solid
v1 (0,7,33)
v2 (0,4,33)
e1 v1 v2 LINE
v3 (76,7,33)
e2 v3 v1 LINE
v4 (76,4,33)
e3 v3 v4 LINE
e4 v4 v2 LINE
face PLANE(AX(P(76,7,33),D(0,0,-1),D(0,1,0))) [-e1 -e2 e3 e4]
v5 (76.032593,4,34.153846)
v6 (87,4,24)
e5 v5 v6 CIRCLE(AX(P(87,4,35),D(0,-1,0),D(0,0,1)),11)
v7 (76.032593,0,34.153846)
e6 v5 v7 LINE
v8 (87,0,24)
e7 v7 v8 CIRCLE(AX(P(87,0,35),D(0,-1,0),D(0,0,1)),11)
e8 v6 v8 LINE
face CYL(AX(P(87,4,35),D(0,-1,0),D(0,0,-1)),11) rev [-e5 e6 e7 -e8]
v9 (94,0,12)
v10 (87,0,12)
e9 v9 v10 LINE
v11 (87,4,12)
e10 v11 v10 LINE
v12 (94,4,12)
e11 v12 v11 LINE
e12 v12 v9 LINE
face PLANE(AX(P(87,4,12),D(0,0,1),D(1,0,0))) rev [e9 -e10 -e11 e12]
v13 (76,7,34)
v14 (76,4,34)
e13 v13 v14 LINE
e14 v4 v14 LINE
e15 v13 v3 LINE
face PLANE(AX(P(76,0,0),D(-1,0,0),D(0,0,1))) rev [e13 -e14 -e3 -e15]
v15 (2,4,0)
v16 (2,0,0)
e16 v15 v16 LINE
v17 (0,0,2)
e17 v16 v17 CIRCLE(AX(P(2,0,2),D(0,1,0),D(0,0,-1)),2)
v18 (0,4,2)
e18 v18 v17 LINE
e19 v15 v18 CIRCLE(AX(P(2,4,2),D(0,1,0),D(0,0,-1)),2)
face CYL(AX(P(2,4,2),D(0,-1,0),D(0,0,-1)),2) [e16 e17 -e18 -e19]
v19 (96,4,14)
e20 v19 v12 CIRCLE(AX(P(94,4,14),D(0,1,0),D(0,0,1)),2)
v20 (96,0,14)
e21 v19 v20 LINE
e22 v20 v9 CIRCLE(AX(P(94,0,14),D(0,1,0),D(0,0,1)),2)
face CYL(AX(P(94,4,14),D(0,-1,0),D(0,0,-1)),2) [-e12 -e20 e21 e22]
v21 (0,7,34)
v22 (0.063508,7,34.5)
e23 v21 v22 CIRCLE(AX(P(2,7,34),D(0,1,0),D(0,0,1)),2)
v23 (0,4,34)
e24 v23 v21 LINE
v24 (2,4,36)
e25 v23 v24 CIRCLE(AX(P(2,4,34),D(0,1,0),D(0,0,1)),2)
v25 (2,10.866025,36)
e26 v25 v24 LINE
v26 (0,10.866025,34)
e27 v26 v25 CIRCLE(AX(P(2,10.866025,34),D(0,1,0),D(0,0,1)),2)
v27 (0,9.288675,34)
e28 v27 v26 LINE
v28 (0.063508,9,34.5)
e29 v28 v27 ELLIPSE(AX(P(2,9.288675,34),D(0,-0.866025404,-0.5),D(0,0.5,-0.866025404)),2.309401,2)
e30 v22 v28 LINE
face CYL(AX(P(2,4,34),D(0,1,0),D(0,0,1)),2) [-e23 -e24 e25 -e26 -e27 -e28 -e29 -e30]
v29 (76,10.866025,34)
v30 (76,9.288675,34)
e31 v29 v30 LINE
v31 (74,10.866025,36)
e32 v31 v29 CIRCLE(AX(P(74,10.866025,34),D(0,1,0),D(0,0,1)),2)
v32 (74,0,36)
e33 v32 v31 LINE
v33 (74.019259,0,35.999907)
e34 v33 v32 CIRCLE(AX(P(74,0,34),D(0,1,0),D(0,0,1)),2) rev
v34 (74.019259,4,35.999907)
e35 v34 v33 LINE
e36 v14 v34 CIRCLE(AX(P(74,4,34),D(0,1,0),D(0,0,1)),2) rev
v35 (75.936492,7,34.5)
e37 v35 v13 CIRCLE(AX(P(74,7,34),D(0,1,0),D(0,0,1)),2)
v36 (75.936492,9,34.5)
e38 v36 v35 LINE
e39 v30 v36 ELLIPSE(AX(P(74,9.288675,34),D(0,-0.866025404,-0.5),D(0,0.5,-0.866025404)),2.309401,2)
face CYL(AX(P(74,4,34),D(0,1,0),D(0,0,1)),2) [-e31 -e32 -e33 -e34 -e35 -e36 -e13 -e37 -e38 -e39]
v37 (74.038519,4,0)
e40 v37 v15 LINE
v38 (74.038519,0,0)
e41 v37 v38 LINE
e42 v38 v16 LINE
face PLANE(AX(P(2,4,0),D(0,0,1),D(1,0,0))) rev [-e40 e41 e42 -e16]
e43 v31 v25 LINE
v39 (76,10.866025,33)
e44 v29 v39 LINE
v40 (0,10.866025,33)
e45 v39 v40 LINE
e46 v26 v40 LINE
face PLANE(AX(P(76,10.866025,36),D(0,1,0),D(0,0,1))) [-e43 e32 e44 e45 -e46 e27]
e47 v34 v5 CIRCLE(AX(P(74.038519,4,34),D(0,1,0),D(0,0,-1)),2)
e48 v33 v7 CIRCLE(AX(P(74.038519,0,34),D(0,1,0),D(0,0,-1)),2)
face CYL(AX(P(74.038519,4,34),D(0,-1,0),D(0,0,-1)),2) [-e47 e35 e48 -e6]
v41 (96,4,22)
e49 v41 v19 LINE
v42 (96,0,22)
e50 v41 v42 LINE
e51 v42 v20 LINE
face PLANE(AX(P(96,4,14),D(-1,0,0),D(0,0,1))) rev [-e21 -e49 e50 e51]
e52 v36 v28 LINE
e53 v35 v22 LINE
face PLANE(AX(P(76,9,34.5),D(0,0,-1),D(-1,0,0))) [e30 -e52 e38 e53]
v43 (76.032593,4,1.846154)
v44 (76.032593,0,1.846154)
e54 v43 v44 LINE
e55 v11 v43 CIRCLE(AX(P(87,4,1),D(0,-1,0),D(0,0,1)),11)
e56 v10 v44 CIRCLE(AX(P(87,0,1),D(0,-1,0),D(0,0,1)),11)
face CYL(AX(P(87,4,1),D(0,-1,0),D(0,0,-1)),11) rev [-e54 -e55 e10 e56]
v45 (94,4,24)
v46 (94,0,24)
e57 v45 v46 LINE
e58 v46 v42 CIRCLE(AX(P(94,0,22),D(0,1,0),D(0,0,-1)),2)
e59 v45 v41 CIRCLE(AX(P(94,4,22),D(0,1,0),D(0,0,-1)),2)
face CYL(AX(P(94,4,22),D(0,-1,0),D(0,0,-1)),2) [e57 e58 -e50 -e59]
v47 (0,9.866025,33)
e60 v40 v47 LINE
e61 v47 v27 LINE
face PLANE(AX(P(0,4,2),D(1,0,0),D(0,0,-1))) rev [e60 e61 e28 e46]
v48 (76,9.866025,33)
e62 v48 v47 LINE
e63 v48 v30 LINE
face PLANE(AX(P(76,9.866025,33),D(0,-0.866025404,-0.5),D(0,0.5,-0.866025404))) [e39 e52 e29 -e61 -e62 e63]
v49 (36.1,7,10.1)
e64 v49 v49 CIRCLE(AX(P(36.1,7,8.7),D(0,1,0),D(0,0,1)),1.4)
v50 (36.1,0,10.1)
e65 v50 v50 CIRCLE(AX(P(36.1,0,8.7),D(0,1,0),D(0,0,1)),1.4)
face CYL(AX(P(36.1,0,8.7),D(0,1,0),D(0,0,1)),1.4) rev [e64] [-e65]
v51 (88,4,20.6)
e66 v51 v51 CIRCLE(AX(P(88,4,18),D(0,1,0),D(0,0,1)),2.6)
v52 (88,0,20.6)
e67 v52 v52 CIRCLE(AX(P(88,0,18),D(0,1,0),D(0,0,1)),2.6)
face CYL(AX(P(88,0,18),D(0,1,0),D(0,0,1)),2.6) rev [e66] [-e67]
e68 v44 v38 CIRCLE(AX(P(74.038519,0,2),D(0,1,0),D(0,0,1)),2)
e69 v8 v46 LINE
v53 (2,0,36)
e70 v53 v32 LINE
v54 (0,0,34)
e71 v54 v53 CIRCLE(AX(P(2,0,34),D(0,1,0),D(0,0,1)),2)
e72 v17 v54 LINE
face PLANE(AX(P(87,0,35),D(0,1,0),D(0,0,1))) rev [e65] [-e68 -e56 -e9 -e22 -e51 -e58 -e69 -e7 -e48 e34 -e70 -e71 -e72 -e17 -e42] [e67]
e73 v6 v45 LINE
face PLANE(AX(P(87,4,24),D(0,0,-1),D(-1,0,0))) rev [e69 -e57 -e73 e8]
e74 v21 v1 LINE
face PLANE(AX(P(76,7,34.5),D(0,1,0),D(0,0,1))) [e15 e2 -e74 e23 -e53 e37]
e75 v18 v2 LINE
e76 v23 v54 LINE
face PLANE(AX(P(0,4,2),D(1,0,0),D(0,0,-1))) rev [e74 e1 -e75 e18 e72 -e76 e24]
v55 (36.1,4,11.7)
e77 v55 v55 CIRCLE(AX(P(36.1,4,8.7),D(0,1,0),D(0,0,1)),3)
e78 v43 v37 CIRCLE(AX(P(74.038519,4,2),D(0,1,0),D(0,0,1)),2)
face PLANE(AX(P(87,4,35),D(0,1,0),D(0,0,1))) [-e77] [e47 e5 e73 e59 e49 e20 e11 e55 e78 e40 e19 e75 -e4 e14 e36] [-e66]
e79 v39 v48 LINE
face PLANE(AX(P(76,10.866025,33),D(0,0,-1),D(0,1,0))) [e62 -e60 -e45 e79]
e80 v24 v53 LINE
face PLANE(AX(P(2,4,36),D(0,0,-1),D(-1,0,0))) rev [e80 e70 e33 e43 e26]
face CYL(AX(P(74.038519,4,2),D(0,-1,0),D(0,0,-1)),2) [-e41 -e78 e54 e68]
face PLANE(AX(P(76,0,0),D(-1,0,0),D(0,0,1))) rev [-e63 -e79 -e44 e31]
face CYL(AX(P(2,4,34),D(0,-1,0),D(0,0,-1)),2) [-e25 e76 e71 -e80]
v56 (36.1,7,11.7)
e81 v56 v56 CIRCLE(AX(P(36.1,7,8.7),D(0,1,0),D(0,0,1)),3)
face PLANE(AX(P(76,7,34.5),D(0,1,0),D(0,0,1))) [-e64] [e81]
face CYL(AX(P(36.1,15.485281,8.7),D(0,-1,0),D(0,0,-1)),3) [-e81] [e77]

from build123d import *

# Parameters (mm, degrees)
BOSS_EXTRUDE1_DEPTH     = 4
BOSS_EXTRUDE2_DEPTH     = 76
FILLET1_R               = 2
SKETCH3_R               = 3
BOSS_EXTRUDE3_DEPTH     = 3
CUT_EXTRUDE1_DEPTH      = 103.757687
CUT_EXTRUDE1_DEPTH_BACK = 103.757687
SKETCH4_R               = 2.6
SKETCH4_R_2             = 1.4


with BuildPart() as part:
    # Sketch1 → Boss-Extrude1 (new body)
    with BuildSketch(Plane(origin=(0, 0, 0), x_dir=(1, 0, 0), z_dir=(0, 1, 0))):
        with BuildLine():
            Line((2, 0), (74.038519, 0))
            ThreePointArc((74.038519, 0), (75.397251, -0.532401), (76.032593, -1.846154))
            ThreePointArc((76.032593, -1.846154), (79.526972, -9.071793), (87, -12))
            Line((87, -12), (94, -12))
            ThreePointArc((94, -12), (95.414214, -12.585786), (96, -14))
            Line((96, -14), (96, -22))
            ThreePointArc((96, -22), (95.414214, -23.414214), (94, -24))
            Line((94, -24), (87, -24))
            ThreePointArc((87, -24), (79.526972, -26.928207), (76.032593, -34.153846))
            ThreePointArc((76.032593, -34.153846), (75.397251, -35.467599), (74.038519, -36))
            Line((74.038519, -36), (2, -36))
            ThreePointArc((2, -36), (0.585786, -35.414214), (0, -34))
            Line((0, -34), (0, -2))
            ThreePointArc((0, -2), (0.585786, -0.585786), (2, 0))
        make_face()
    extrude(amount=BOSS_EXTRUDE1_DEPTH)

    # Sketch2 → Boss-Extrude2 (add)
    with BuildSketch(Plane.ZY):
        Polygon((36, 4), (36, 10.866025), (33, 10.866025), (33, 9.866025), (34.5, 9), (34.5, 7), (33, 7), (33, 4), align=None)
    extrude(amount=-BOSS_EXTRUDE2_DEPTH)

    # Fillet1
    # the kernel refuses this fillet: 2 mm, written as the material it takes off along each edge
    with BuildSketch(Plane(origin=(0, -1, 36), x_dir=(0, 0, -1), z_dir=(0, 1, 0))) as fillet1_piece_1:
        with BuildLine():
            CenterArc((FILLET1_R, -FILLET1_R), FILLET1_R, 90, 90)
            Line((0, -FILLET1_R), (0, 0))
            Line((0, 0), (FILLET1_R, 0))
        make_face()
    extrude(amount=16.866025, mode=Mode.SUBTRACT)
    with BuildSketch(Plane(origin=(76, -1, 36), x_dir=(-1, 0, 0), z_dir=(0, 1, 0))) as fillet1_piece_2_section:
        with BuildLine():
            CenterArc((FILLET1_R, -FILLET1_R), FILLET1_R, 90, 90)
            Line((0, -FILLET1_R), (0, 0))
            Line((0, 0), (FILLET1_R, 0))
        make_face()
    fillet1_piece_2 = extrude(amount=16.866025, mode=Mode.PRIVATE)
    fillet1_piece_2 = fillet1_piece_2 - Plane(origin=(74.038519, 2, 34), x_dir=(0.9970370305242855, 0, 0.07692307692308645), z_dir=(0, -1, 0)) * Cylinder(2, 42, mode=Mode.PRIVATE)
    add(fillet1_piece_2, mode=Mode.SUBTRACT)
    with BuildSketch(Plane(origin=(76, 4, 36), x_dir=(-1, 0, 0), z_dir=(0, 1, 0))) as fillet1_piece_3:
        with BuildLine():
            CenterArc((FILLET1_R, -FILLET1_R), FILLET1_R, 90, 90)
            Line((0, -FILLET1_R), (0, 0))
            Line((0, 0), (FILLET1_R, 0))
        make_face()
    extrude(amount=11.866025, mode=Mode.SUBTRACT)

    # Sketch3 → Boss-Extrude3 (add)
    with BuildSketch(Plane(origin=(0, 4, 0), x_dir=(1, 0, 0), z_dir=(0, 1, 0))):
        with Locations(Location((36.1, -8.7, 0), (0, 0, 270))):
            Circle(SKETCH3_R)
    extrude(amount=BOSS_EXTRUDE3_DEPTH)

    # Sketch4 → Cut-Extrude1 (cut, two sides: drawn at the far end of the back side and taken through both)
    with BuildSketch(Plane(origin=(0, 4, 0), x_dir=(1, 0, 0), z_dir=(0, 1, 0)).offset(-CUT_EXTRUDE1_DEPTH_BACK)):
        with Locations(Location((88, -18, 0), (0, 0, 270))):
            Circle(SKETCH4_R)
        with Locations(Location((36.1, -8.7, 0), (0, 0, 270))):
            Circle(SKETCH4_R_2)
    extrude(amount=CUT_EXTRUDE1_DEPTH + CUT_EXTRUDE1_DEPTH_BACK, mode=Mode.SUBTRACT)


solid = part.part
